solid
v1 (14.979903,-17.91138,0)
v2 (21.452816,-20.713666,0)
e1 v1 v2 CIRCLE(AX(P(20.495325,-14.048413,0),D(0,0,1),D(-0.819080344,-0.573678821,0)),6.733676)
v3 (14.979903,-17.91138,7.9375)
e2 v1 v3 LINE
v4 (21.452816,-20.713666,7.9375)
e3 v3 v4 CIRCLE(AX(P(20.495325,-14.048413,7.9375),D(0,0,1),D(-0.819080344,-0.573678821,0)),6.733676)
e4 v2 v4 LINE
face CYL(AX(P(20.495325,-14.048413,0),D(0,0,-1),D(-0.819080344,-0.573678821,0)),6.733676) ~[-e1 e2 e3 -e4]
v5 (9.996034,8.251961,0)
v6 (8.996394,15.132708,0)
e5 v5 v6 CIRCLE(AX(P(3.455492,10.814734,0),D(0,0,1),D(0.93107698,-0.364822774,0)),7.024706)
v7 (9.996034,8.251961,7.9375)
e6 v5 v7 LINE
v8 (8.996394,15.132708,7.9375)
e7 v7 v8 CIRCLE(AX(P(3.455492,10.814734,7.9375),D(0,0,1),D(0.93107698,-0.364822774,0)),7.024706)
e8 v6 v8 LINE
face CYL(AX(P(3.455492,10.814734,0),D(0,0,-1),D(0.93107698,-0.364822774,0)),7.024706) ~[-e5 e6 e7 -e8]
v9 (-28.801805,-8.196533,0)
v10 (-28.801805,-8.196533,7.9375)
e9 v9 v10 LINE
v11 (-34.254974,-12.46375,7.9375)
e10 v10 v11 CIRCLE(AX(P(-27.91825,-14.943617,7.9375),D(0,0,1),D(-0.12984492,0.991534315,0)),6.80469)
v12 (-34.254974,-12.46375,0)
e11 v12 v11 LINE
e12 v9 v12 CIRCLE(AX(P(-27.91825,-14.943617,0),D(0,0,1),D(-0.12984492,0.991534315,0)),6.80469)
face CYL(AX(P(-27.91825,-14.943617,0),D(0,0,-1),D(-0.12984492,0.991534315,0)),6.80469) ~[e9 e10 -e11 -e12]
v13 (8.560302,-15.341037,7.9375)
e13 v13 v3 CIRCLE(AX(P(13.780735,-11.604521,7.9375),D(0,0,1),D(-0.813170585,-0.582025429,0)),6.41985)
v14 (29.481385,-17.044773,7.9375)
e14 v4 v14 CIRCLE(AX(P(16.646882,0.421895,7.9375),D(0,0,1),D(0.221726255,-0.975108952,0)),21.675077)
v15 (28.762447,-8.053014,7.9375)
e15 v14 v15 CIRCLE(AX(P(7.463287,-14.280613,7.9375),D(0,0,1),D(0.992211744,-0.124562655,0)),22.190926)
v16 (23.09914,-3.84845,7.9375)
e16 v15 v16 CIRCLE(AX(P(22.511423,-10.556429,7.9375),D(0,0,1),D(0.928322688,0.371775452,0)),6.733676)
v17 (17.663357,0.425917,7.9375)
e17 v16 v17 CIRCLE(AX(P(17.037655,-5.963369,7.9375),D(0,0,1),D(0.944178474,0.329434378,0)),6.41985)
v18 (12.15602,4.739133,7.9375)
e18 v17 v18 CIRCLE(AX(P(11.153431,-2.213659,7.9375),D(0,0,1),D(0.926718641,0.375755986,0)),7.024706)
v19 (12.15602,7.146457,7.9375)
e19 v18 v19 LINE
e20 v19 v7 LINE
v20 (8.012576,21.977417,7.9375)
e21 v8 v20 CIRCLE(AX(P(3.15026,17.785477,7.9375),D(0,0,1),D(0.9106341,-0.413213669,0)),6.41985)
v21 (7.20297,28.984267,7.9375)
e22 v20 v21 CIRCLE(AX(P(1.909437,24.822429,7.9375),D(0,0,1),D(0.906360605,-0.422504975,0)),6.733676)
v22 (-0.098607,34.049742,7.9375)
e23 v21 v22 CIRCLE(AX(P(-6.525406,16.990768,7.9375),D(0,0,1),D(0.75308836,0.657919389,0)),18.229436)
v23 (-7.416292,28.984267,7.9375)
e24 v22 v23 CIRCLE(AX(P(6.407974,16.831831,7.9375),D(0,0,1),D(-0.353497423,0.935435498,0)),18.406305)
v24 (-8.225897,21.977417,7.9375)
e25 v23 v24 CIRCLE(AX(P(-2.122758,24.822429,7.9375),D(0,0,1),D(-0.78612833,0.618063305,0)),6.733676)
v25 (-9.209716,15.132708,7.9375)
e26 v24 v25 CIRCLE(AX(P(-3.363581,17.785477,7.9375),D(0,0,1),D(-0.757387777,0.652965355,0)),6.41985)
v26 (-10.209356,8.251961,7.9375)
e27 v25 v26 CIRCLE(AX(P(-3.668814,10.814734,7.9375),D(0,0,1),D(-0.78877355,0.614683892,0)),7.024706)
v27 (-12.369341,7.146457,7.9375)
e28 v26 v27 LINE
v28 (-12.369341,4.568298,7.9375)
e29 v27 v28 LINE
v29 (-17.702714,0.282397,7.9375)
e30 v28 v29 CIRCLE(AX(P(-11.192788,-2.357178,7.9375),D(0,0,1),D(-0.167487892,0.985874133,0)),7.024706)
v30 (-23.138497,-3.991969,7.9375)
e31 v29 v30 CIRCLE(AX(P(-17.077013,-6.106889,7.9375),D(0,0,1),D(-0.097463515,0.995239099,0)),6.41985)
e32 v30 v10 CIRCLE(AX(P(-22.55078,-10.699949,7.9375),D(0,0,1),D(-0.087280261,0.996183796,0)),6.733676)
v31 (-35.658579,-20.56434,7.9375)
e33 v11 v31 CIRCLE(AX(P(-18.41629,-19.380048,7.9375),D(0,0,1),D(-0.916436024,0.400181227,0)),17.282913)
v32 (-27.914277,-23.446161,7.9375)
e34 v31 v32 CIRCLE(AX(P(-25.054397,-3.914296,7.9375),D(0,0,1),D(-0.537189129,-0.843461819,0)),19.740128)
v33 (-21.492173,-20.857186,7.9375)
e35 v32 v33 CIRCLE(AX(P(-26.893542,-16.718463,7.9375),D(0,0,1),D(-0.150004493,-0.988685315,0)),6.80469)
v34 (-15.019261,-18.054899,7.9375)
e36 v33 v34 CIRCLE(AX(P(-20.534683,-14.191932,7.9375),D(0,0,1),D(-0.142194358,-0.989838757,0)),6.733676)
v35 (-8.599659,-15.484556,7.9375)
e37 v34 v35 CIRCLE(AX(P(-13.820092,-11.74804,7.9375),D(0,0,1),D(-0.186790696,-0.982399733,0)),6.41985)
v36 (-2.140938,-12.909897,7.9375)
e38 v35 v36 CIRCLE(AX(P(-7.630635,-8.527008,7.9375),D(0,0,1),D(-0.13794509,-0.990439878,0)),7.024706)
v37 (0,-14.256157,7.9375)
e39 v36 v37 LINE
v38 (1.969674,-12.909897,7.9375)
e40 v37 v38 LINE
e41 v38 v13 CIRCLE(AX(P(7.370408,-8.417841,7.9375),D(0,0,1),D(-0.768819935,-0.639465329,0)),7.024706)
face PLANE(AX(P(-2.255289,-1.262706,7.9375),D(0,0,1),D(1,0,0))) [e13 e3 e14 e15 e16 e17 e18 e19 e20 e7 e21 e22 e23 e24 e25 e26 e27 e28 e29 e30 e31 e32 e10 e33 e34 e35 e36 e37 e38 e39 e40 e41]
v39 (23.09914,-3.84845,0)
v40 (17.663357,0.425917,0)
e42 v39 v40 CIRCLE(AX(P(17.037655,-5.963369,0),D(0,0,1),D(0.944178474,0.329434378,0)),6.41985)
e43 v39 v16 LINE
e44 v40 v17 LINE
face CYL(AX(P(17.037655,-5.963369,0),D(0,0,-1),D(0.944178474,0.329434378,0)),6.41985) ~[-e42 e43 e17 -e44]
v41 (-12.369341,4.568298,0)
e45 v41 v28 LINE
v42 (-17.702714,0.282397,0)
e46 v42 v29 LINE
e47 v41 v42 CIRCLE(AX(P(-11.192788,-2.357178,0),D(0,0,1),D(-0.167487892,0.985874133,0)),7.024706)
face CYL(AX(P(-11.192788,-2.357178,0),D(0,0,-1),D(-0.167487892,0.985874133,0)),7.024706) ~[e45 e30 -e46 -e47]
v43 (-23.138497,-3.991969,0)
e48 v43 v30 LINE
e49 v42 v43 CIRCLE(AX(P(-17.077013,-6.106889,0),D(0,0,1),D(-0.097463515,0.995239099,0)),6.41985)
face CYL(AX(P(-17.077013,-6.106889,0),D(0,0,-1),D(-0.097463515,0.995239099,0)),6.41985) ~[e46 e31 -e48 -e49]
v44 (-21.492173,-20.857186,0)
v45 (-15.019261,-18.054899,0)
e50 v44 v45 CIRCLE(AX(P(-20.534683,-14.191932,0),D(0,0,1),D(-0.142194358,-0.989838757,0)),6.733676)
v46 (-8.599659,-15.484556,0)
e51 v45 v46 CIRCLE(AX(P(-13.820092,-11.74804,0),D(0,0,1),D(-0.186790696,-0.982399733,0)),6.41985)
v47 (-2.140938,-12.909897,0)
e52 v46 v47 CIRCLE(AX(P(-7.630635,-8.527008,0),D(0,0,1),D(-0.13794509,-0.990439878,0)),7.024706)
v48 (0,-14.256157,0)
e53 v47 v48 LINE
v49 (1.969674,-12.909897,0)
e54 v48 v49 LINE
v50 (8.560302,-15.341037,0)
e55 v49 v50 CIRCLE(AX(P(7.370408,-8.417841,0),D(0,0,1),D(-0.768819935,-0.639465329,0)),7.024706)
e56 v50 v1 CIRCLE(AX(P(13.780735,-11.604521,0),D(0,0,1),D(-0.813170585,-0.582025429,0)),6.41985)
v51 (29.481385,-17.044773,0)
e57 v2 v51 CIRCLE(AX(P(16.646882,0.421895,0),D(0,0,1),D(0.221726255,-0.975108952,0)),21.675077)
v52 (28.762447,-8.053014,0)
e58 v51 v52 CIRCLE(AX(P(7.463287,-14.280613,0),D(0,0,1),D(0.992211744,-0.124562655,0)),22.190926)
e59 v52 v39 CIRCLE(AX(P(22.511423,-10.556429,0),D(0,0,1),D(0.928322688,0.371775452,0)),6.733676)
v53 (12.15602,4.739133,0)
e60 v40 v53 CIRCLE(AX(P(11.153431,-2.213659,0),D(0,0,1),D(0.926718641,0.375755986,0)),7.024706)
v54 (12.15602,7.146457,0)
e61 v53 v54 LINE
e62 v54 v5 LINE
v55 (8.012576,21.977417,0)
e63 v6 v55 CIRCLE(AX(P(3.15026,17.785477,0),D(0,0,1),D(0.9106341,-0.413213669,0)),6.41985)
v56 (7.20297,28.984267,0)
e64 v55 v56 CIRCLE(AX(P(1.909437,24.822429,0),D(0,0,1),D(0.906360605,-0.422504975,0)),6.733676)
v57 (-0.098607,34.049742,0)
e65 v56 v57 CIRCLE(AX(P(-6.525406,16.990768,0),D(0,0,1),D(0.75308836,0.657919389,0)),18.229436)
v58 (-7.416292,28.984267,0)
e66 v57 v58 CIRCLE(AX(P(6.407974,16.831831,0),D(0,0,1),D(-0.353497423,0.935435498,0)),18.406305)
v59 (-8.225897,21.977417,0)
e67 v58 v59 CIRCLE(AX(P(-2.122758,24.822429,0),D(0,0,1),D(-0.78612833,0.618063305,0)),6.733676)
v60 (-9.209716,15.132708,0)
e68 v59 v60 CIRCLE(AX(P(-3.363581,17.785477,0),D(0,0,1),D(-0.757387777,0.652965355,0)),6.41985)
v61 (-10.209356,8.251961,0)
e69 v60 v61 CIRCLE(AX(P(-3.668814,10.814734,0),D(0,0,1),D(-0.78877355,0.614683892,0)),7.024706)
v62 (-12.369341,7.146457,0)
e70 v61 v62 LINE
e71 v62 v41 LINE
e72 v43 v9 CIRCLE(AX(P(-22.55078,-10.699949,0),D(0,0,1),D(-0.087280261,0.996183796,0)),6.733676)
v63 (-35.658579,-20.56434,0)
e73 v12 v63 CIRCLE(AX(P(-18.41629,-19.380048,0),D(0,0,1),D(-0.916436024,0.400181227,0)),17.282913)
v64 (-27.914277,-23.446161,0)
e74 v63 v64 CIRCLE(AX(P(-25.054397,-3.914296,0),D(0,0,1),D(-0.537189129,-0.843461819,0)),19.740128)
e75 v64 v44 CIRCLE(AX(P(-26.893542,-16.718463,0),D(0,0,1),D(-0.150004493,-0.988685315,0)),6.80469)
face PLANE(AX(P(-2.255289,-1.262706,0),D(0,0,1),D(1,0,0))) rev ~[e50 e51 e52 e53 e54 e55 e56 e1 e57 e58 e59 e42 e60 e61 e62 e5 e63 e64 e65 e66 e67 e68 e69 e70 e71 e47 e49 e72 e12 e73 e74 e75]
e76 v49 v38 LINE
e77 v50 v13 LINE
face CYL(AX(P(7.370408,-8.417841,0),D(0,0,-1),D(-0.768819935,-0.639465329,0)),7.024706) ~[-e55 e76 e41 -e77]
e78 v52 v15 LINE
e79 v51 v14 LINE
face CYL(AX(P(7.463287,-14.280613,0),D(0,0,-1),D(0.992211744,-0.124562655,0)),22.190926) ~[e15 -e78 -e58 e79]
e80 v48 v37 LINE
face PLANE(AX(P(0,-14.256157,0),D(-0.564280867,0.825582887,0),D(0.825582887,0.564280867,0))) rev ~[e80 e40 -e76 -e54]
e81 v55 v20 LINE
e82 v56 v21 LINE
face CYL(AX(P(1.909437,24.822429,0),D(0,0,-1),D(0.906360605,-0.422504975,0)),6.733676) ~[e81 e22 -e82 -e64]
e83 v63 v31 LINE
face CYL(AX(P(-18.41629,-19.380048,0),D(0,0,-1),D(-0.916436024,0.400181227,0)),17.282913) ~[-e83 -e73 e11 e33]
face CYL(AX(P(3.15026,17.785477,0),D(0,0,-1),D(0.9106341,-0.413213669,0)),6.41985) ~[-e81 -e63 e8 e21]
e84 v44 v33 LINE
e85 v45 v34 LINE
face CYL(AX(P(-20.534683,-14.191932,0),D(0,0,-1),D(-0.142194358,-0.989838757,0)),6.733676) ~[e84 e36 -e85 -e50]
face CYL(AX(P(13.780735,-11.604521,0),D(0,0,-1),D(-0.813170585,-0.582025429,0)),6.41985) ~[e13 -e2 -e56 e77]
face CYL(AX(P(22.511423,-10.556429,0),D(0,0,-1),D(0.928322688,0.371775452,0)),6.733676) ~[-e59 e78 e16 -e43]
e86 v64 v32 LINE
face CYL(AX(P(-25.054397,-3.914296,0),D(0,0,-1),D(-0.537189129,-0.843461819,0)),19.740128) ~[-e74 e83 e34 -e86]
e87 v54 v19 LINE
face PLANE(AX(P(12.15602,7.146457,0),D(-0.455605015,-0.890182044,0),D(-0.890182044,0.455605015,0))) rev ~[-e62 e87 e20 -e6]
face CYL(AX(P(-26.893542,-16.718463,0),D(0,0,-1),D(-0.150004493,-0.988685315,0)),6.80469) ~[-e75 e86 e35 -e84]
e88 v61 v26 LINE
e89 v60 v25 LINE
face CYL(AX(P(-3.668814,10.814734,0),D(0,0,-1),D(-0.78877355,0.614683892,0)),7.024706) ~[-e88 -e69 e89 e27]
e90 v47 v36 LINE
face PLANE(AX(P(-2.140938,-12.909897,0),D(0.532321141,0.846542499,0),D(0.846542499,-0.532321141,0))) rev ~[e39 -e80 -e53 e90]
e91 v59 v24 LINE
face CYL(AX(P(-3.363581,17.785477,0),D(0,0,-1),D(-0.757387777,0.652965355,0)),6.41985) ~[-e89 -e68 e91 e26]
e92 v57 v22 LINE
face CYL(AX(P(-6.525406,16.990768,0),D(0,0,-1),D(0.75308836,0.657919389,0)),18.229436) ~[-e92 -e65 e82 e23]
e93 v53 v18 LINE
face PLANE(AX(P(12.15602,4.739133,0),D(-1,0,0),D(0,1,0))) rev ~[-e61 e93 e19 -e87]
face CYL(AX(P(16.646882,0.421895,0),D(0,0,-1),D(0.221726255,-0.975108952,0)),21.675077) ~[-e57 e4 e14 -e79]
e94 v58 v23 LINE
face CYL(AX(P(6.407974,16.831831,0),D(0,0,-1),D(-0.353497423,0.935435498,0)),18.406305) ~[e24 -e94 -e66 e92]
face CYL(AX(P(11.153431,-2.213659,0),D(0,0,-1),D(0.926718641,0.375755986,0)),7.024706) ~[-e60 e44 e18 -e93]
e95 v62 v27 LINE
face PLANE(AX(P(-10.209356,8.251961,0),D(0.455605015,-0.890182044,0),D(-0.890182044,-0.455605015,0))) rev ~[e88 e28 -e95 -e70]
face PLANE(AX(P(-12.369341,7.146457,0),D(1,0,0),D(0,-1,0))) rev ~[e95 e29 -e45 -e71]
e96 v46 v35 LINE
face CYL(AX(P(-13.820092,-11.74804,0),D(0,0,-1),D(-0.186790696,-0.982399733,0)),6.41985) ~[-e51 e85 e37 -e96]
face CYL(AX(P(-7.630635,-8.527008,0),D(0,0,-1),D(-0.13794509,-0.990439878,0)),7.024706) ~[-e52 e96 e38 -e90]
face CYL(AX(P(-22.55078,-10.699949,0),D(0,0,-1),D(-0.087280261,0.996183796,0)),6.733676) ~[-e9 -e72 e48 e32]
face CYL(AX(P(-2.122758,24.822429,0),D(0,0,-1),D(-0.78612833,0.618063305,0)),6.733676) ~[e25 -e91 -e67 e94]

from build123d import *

# Parameters (mm, degrees)
F1_DEPTH = 7.9375


# Not quite as in the source:
# - a length typed as a fraction of an inch, garbled in the dataset ("3 / 203.2 mm" for 3/8 in), is restored


with BuildPart() as f1:
    # F0 (on Top) → F1 (new body)
    with BuildSketch(Plane.XY):
        with BuildLine():
            ThreePointArc((-0.0986067535, 34.0497419238), (-4.0682176485, 31.9659465467), (-7.4162920937, 28.9842672646))
            ThreePointArc((-7.4162920937, 28.9842672646), (-8.8119305122, 25.5953281623), (-8.2258973271, 21.977417171))
            ThreePointArc((-8.2258973271, 21.977417171), (-9.7181261566, 18.698842434), (-9.2097157612, 15.1327075437))
            ThreePointArc((-9.2097157612, 15.1327075437), (-10.6205392688, 11.8246856933), (-10.2093555033, 8.2519613206))
            Line((-10.2093555033, 8.2519613206), (-12.369341217, 7.1464567445))
            Line((-12.369341217, 7.1464567445), (-12.369341217, 4.6386048198))
            Line((-12.369341217, 4.6386048198), (-12.369341217, 4.5682978211))
            ThreePointArc((-12.369341217, 4.5682978211), (-15.5930977879, 3.1185654947), (-17.7027139134, 0.2823972963))
            ThreePointArc((-17.7027139134, 0.2823972963), (-21.0452825194, -1.0603738309), (-23.1384971151, -3.9919692741))
            ThreePointArc((-23.1384971151, -3.9919692741), (-26.5647165348, -5.2934051439), (-28.80180468, -8.19653302))
            ThreePointArc((-28.80180468, -8.19653302), (-32.1117440701, -9.5846599904), (-34.254974256, -12.4637500588))
            ThreePointArc((-34.254974256, -12.4637500588), (-35.4454588739, -16.4293701566), (-35.6585793197, -20.564340055))
            ThreePointArc((-35.6585793197, -20.564340055), (-31.9389059128, -22.4150036937), (-27.9142765499, -23.4461606411))
            ThreePointArc((-27.9142765499, -23.4461606411), (-24.3492963179, -23.0296138883), (-21.4921734029, -20.8571857766))
            ThreePointArc((-21.4921734029, -20.8571857766), (-17.8594468391, -20.3713745504), (-15.0192606046, -18.054899429))
            ThreePointArc((-15.0192606046, -18.054899429), (-11.4338171794, -17.7079201351), (-8.5996589687, -15.484556372))
            ThreePointArc((-8.5996589687, -15.484556372), (-5.0294162563, -15.0523544446), (-2.1409380715, -12.9098966718))
            Line((-2.1409380715, -12.9098966718), (0, -14.2561570176))
            Line((0, -14.2561570176), (1.9696742658, -12.9098966718))
            ThreePointArc((1.9696742658, -12.9098966718), (4.9392756736, -15.0084468105), (8.560301624, -15.3410370587))
            ThreePointArc((8.560301624, -15.3410370587), (11.3944598347, -17.5644008218), (14.9799032599, -17.9113801157))
            ThreePointArc((14.9799032599, -17.9113801157), (17.8200894944, -20.2278552371), (21.4528160582, -20.7136664634))
            ThreePointArc((21.4528160582, -20.7136664634), (25.6558468929, -19.2922500665), (29.4813849032, -17.0447733253))
            ThreePointArc((29.4813849032, -17.0447733253), (29.5836204245, -12.511977875), (28.7624473353, -8.0530137067))
            ThreePointArc((28.7624473353, -8.0530137067), (26.5253591901, -5.1498858306), (23.0991397704, -3.8484499608))
            ThreePointArc((23.0991397704, -3.8484499608), (21.0059251747, -0.9168545176), (17.6633565687, 0.4259166096))
            ThreePointArc((17.6633565687, 0.4259166096), (15.4847616458, 3.3168082822), (12.1560195839, 4.739132713))
            Line((12.1560195839, 4.739132713), (12.1560195839, 7.1464567445))
            Line((12.1560195839, 7.1464567445), (9.9960338703, 8.2519613206))
            ThreePointArc((9.9960338703, 8.2519613206), (10.4072176357, 11.8246856933), (8.9963941282, 15.1327075437))
            ThreePointArc((8.9963941282, 15.1327075437), (9.5048045235, 18.698842434), (8.012575694, 21.977417171))
            ThreePointArc((8.012575694, 21.977417171), (8.5986088792, 25.5953281623), (7.2029704606, 28.9842672646))
            ThreePointArc((7.2029704606, 28.9842672646), (3.8655773676, 31.9687453881), (-0.0986067535, 34.0497419238))
        make_face()
    extrude(amount=F1_DEPTH)


solid = f1.part
